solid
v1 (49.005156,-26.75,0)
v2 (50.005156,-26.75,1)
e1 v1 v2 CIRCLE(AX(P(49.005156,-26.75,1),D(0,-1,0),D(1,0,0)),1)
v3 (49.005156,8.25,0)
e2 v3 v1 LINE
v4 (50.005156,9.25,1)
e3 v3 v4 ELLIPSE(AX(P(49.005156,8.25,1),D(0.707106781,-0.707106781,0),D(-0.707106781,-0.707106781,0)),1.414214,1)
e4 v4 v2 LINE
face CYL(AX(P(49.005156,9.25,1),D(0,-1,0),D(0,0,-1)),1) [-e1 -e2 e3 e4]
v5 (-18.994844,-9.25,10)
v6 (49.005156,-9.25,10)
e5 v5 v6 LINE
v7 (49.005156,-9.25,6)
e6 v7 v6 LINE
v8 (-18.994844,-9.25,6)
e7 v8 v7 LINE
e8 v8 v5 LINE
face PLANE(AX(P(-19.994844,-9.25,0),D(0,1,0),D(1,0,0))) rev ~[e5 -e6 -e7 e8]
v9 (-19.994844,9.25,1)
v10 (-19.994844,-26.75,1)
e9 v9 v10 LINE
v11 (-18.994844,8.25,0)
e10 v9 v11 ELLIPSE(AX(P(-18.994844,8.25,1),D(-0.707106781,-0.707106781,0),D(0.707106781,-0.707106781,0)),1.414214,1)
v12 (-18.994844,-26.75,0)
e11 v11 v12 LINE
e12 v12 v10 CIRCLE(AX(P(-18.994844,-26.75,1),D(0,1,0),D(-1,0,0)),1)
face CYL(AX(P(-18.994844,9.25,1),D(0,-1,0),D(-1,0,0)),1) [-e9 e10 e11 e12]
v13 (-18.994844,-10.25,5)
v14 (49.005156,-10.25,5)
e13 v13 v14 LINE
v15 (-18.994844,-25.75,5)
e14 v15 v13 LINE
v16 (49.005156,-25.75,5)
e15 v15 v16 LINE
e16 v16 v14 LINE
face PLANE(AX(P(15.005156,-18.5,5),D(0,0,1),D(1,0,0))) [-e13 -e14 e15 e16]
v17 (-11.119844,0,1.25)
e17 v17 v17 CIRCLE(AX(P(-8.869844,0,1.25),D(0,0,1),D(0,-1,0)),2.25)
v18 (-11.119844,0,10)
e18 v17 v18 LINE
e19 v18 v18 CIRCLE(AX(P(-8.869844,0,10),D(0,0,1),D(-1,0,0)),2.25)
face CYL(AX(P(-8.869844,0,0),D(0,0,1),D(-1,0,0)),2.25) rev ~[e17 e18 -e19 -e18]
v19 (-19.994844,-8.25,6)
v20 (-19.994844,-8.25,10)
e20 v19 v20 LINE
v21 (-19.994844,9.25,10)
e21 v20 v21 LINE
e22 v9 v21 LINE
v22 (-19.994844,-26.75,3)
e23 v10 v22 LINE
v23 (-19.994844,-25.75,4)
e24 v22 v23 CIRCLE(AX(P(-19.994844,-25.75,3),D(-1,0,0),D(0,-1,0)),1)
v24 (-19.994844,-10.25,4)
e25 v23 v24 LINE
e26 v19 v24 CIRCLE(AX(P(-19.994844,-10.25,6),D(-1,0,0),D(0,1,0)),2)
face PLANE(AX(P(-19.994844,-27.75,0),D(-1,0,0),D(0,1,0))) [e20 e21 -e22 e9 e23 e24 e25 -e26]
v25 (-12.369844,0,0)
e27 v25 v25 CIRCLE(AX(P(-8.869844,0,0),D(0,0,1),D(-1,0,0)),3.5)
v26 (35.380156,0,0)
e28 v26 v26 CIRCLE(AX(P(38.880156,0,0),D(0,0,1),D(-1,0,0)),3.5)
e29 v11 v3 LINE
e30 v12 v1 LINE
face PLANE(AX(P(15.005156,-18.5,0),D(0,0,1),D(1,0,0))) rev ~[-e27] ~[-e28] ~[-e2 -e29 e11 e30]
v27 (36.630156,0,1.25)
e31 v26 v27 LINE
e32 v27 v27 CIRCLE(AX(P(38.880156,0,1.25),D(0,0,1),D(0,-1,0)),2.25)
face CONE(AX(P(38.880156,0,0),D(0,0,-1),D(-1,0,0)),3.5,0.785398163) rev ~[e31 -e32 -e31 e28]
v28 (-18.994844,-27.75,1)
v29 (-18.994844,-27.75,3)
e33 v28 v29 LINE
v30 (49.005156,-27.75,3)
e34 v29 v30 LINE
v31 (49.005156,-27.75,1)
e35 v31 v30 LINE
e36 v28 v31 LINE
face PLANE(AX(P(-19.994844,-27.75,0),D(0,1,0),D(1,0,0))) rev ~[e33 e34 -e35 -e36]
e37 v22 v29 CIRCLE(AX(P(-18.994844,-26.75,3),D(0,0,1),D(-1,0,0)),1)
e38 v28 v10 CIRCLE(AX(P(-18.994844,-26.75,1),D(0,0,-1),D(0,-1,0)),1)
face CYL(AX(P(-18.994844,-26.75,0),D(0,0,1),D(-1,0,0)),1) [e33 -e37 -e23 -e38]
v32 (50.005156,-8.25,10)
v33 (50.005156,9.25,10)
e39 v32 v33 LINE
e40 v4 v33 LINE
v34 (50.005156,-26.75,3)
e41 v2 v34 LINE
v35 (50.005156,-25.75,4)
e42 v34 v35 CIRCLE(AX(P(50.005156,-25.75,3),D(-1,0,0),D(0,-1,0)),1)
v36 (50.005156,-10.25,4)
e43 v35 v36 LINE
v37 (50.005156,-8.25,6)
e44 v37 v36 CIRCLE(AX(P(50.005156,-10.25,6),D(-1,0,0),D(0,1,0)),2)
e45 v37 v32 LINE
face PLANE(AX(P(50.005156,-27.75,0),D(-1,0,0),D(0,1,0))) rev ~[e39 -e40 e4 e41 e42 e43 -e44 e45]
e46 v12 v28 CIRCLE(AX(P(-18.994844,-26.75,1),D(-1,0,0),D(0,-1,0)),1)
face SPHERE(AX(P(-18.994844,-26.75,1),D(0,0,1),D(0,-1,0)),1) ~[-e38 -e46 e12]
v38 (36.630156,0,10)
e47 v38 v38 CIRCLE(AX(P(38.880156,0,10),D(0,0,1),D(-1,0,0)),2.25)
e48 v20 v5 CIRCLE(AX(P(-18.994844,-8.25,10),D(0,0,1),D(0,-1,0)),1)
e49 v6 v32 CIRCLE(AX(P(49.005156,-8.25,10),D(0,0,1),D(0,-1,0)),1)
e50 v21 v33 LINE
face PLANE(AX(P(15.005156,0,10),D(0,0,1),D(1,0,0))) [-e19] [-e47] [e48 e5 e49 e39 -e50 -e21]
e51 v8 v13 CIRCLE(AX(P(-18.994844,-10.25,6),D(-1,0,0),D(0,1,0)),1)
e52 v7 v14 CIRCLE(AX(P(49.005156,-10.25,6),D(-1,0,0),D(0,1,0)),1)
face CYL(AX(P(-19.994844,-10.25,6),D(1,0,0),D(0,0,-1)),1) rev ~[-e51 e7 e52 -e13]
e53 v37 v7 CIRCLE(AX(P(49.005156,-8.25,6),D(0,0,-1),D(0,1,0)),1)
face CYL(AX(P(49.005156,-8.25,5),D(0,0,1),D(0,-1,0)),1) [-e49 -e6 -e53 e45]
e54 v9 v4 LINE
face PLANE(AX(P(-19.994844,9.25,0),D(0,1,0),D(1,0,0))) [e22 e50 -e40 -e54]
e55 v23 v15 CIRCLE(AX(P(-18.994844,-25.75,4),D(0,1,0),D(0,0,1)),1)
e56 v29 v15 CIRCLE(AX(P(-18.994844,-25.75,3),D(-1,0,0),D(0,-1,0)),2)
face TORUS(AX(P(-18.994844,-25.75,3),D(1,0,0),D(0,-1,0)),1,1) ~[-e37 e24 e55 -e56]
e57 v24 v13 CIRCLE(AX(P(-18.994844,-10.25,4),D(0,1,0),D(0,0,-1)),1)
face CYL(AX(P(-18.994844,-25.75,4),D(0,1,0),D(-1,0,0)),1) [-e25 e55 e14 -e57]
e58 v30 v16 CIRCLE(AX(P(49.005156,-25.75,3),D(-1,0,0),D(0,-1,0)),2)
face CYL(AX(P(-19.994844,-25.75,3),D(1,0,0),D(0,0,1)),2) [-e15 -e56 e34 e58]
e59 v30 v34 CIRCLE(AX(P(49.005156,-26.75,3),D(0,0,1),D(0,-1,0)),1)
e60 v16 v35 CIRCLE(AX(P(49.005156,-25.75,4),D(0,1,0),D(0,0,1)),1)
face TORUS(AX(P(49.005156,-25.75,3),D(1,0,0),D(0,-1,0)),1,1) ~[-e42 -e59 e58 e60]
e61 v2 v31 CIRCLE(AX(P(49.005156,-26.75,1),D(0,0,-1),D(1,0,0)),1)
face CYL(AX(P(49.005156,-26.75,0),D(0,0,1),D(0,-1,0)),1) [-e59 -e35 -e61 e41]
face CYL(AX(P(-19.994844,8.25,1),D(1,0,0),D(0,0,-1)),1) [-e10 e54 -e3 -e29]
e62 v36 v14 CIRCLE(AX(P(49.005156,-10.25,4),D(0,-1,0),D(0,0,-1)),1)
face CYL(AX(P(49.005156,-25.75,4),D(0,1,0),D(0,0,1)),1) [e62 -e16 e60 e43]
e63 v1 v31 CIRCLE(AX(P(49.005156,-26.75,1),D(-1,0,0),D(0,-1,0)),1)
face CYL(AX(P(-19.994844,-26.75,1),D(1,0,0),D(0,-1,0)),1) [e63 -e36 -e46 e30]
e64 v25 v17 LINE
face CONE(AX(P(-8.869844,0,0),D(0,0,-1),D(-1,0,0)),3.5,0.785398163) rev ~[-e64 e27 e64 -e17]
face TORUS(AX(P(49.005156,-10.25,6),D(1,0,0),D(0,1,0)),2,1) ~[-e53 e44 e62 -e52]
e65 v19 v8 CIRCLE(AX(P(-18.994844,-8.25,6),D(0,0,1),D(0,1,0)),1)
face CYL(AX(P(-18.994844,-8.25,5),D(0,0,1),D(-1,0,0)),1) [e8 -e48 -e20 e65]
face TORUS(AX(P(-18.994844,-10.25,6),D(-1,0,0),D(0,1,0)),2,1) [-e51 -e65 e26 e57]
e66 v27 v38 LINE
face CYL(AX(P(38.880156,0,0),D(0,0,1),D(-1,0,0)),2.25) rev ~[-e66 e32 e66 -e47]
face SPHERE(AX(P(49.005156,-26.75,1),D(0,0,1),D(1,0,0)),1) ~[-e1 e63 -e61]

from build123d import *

# Parameters (mm, degrees)
F0_W           = 70
F0_H           = 18.5
F1_DEPTH       = 10
F2_DEPTH       = 5
F3_R           = 2
F4_R           = 1
F5_D           = 4.5
F5_CSINK_D     = 7
F5_CSINK_ANGLE = 90


with BuildPart() as f1:
    # F0 (on Top) → F1 (new body)
    with BuildSketch(Plane.XY):
        with Locations((15.0051557424, 0)):
            Rectangle(F0_W, F0_H)
    extrude(amount=F1_DEPTH)

    # F0 (on Top) → F2 (join)
    with BuildSketch(Plane.XY):
        with Locations((15.0051557424, -18.5)):
            Rectangle(F0_W, F0_H)
    extrude(amount=F2_DEPTH)

    # F3
    f3_edges = [f1.edges().sort_by_distance(p)[0] for p in [
        (15.005156, -27.75, 5),
    ]]
    fillet(f3_edges, radius=F3_R)

    # F4
    f4_edges = [f1.edges().sort_by_distance(p)[0] for p in [
        (50.005156, -17.5, 5),
        (-19.994844, -17.5, 5),
        (50.005156, -9.25, 0),
        (15.005156, -27.75, 0),
        (-19.994844, -9.25, 0),
        (15.005156, 9.25, 0),
        (15.005156, -9.25, 5),
        (-19.994844, -27.164214, 4.414214),
        (-19.994844, -9.25, 7.5),
        (50.005156, -27.164214, 4.414214),
        (50.005156, -9.25, 7.5),
    ]]
    fillet(f4_edges, radius=F4_R)

    # F5 (through all)
    with Locations(Plane(origin=(0, 0, 0), x_dir=(1, 0, 0), z_dir=(0, 0, -1))):
        with Locations((-8.8698442576, 0), (38.8801557424, 0)):
            CounterSinkHole(F5_D / 2, F5_CSINK_D / 2, counter_sink_angle=F5_CSINK_ANGLE)


solid = f1.part
